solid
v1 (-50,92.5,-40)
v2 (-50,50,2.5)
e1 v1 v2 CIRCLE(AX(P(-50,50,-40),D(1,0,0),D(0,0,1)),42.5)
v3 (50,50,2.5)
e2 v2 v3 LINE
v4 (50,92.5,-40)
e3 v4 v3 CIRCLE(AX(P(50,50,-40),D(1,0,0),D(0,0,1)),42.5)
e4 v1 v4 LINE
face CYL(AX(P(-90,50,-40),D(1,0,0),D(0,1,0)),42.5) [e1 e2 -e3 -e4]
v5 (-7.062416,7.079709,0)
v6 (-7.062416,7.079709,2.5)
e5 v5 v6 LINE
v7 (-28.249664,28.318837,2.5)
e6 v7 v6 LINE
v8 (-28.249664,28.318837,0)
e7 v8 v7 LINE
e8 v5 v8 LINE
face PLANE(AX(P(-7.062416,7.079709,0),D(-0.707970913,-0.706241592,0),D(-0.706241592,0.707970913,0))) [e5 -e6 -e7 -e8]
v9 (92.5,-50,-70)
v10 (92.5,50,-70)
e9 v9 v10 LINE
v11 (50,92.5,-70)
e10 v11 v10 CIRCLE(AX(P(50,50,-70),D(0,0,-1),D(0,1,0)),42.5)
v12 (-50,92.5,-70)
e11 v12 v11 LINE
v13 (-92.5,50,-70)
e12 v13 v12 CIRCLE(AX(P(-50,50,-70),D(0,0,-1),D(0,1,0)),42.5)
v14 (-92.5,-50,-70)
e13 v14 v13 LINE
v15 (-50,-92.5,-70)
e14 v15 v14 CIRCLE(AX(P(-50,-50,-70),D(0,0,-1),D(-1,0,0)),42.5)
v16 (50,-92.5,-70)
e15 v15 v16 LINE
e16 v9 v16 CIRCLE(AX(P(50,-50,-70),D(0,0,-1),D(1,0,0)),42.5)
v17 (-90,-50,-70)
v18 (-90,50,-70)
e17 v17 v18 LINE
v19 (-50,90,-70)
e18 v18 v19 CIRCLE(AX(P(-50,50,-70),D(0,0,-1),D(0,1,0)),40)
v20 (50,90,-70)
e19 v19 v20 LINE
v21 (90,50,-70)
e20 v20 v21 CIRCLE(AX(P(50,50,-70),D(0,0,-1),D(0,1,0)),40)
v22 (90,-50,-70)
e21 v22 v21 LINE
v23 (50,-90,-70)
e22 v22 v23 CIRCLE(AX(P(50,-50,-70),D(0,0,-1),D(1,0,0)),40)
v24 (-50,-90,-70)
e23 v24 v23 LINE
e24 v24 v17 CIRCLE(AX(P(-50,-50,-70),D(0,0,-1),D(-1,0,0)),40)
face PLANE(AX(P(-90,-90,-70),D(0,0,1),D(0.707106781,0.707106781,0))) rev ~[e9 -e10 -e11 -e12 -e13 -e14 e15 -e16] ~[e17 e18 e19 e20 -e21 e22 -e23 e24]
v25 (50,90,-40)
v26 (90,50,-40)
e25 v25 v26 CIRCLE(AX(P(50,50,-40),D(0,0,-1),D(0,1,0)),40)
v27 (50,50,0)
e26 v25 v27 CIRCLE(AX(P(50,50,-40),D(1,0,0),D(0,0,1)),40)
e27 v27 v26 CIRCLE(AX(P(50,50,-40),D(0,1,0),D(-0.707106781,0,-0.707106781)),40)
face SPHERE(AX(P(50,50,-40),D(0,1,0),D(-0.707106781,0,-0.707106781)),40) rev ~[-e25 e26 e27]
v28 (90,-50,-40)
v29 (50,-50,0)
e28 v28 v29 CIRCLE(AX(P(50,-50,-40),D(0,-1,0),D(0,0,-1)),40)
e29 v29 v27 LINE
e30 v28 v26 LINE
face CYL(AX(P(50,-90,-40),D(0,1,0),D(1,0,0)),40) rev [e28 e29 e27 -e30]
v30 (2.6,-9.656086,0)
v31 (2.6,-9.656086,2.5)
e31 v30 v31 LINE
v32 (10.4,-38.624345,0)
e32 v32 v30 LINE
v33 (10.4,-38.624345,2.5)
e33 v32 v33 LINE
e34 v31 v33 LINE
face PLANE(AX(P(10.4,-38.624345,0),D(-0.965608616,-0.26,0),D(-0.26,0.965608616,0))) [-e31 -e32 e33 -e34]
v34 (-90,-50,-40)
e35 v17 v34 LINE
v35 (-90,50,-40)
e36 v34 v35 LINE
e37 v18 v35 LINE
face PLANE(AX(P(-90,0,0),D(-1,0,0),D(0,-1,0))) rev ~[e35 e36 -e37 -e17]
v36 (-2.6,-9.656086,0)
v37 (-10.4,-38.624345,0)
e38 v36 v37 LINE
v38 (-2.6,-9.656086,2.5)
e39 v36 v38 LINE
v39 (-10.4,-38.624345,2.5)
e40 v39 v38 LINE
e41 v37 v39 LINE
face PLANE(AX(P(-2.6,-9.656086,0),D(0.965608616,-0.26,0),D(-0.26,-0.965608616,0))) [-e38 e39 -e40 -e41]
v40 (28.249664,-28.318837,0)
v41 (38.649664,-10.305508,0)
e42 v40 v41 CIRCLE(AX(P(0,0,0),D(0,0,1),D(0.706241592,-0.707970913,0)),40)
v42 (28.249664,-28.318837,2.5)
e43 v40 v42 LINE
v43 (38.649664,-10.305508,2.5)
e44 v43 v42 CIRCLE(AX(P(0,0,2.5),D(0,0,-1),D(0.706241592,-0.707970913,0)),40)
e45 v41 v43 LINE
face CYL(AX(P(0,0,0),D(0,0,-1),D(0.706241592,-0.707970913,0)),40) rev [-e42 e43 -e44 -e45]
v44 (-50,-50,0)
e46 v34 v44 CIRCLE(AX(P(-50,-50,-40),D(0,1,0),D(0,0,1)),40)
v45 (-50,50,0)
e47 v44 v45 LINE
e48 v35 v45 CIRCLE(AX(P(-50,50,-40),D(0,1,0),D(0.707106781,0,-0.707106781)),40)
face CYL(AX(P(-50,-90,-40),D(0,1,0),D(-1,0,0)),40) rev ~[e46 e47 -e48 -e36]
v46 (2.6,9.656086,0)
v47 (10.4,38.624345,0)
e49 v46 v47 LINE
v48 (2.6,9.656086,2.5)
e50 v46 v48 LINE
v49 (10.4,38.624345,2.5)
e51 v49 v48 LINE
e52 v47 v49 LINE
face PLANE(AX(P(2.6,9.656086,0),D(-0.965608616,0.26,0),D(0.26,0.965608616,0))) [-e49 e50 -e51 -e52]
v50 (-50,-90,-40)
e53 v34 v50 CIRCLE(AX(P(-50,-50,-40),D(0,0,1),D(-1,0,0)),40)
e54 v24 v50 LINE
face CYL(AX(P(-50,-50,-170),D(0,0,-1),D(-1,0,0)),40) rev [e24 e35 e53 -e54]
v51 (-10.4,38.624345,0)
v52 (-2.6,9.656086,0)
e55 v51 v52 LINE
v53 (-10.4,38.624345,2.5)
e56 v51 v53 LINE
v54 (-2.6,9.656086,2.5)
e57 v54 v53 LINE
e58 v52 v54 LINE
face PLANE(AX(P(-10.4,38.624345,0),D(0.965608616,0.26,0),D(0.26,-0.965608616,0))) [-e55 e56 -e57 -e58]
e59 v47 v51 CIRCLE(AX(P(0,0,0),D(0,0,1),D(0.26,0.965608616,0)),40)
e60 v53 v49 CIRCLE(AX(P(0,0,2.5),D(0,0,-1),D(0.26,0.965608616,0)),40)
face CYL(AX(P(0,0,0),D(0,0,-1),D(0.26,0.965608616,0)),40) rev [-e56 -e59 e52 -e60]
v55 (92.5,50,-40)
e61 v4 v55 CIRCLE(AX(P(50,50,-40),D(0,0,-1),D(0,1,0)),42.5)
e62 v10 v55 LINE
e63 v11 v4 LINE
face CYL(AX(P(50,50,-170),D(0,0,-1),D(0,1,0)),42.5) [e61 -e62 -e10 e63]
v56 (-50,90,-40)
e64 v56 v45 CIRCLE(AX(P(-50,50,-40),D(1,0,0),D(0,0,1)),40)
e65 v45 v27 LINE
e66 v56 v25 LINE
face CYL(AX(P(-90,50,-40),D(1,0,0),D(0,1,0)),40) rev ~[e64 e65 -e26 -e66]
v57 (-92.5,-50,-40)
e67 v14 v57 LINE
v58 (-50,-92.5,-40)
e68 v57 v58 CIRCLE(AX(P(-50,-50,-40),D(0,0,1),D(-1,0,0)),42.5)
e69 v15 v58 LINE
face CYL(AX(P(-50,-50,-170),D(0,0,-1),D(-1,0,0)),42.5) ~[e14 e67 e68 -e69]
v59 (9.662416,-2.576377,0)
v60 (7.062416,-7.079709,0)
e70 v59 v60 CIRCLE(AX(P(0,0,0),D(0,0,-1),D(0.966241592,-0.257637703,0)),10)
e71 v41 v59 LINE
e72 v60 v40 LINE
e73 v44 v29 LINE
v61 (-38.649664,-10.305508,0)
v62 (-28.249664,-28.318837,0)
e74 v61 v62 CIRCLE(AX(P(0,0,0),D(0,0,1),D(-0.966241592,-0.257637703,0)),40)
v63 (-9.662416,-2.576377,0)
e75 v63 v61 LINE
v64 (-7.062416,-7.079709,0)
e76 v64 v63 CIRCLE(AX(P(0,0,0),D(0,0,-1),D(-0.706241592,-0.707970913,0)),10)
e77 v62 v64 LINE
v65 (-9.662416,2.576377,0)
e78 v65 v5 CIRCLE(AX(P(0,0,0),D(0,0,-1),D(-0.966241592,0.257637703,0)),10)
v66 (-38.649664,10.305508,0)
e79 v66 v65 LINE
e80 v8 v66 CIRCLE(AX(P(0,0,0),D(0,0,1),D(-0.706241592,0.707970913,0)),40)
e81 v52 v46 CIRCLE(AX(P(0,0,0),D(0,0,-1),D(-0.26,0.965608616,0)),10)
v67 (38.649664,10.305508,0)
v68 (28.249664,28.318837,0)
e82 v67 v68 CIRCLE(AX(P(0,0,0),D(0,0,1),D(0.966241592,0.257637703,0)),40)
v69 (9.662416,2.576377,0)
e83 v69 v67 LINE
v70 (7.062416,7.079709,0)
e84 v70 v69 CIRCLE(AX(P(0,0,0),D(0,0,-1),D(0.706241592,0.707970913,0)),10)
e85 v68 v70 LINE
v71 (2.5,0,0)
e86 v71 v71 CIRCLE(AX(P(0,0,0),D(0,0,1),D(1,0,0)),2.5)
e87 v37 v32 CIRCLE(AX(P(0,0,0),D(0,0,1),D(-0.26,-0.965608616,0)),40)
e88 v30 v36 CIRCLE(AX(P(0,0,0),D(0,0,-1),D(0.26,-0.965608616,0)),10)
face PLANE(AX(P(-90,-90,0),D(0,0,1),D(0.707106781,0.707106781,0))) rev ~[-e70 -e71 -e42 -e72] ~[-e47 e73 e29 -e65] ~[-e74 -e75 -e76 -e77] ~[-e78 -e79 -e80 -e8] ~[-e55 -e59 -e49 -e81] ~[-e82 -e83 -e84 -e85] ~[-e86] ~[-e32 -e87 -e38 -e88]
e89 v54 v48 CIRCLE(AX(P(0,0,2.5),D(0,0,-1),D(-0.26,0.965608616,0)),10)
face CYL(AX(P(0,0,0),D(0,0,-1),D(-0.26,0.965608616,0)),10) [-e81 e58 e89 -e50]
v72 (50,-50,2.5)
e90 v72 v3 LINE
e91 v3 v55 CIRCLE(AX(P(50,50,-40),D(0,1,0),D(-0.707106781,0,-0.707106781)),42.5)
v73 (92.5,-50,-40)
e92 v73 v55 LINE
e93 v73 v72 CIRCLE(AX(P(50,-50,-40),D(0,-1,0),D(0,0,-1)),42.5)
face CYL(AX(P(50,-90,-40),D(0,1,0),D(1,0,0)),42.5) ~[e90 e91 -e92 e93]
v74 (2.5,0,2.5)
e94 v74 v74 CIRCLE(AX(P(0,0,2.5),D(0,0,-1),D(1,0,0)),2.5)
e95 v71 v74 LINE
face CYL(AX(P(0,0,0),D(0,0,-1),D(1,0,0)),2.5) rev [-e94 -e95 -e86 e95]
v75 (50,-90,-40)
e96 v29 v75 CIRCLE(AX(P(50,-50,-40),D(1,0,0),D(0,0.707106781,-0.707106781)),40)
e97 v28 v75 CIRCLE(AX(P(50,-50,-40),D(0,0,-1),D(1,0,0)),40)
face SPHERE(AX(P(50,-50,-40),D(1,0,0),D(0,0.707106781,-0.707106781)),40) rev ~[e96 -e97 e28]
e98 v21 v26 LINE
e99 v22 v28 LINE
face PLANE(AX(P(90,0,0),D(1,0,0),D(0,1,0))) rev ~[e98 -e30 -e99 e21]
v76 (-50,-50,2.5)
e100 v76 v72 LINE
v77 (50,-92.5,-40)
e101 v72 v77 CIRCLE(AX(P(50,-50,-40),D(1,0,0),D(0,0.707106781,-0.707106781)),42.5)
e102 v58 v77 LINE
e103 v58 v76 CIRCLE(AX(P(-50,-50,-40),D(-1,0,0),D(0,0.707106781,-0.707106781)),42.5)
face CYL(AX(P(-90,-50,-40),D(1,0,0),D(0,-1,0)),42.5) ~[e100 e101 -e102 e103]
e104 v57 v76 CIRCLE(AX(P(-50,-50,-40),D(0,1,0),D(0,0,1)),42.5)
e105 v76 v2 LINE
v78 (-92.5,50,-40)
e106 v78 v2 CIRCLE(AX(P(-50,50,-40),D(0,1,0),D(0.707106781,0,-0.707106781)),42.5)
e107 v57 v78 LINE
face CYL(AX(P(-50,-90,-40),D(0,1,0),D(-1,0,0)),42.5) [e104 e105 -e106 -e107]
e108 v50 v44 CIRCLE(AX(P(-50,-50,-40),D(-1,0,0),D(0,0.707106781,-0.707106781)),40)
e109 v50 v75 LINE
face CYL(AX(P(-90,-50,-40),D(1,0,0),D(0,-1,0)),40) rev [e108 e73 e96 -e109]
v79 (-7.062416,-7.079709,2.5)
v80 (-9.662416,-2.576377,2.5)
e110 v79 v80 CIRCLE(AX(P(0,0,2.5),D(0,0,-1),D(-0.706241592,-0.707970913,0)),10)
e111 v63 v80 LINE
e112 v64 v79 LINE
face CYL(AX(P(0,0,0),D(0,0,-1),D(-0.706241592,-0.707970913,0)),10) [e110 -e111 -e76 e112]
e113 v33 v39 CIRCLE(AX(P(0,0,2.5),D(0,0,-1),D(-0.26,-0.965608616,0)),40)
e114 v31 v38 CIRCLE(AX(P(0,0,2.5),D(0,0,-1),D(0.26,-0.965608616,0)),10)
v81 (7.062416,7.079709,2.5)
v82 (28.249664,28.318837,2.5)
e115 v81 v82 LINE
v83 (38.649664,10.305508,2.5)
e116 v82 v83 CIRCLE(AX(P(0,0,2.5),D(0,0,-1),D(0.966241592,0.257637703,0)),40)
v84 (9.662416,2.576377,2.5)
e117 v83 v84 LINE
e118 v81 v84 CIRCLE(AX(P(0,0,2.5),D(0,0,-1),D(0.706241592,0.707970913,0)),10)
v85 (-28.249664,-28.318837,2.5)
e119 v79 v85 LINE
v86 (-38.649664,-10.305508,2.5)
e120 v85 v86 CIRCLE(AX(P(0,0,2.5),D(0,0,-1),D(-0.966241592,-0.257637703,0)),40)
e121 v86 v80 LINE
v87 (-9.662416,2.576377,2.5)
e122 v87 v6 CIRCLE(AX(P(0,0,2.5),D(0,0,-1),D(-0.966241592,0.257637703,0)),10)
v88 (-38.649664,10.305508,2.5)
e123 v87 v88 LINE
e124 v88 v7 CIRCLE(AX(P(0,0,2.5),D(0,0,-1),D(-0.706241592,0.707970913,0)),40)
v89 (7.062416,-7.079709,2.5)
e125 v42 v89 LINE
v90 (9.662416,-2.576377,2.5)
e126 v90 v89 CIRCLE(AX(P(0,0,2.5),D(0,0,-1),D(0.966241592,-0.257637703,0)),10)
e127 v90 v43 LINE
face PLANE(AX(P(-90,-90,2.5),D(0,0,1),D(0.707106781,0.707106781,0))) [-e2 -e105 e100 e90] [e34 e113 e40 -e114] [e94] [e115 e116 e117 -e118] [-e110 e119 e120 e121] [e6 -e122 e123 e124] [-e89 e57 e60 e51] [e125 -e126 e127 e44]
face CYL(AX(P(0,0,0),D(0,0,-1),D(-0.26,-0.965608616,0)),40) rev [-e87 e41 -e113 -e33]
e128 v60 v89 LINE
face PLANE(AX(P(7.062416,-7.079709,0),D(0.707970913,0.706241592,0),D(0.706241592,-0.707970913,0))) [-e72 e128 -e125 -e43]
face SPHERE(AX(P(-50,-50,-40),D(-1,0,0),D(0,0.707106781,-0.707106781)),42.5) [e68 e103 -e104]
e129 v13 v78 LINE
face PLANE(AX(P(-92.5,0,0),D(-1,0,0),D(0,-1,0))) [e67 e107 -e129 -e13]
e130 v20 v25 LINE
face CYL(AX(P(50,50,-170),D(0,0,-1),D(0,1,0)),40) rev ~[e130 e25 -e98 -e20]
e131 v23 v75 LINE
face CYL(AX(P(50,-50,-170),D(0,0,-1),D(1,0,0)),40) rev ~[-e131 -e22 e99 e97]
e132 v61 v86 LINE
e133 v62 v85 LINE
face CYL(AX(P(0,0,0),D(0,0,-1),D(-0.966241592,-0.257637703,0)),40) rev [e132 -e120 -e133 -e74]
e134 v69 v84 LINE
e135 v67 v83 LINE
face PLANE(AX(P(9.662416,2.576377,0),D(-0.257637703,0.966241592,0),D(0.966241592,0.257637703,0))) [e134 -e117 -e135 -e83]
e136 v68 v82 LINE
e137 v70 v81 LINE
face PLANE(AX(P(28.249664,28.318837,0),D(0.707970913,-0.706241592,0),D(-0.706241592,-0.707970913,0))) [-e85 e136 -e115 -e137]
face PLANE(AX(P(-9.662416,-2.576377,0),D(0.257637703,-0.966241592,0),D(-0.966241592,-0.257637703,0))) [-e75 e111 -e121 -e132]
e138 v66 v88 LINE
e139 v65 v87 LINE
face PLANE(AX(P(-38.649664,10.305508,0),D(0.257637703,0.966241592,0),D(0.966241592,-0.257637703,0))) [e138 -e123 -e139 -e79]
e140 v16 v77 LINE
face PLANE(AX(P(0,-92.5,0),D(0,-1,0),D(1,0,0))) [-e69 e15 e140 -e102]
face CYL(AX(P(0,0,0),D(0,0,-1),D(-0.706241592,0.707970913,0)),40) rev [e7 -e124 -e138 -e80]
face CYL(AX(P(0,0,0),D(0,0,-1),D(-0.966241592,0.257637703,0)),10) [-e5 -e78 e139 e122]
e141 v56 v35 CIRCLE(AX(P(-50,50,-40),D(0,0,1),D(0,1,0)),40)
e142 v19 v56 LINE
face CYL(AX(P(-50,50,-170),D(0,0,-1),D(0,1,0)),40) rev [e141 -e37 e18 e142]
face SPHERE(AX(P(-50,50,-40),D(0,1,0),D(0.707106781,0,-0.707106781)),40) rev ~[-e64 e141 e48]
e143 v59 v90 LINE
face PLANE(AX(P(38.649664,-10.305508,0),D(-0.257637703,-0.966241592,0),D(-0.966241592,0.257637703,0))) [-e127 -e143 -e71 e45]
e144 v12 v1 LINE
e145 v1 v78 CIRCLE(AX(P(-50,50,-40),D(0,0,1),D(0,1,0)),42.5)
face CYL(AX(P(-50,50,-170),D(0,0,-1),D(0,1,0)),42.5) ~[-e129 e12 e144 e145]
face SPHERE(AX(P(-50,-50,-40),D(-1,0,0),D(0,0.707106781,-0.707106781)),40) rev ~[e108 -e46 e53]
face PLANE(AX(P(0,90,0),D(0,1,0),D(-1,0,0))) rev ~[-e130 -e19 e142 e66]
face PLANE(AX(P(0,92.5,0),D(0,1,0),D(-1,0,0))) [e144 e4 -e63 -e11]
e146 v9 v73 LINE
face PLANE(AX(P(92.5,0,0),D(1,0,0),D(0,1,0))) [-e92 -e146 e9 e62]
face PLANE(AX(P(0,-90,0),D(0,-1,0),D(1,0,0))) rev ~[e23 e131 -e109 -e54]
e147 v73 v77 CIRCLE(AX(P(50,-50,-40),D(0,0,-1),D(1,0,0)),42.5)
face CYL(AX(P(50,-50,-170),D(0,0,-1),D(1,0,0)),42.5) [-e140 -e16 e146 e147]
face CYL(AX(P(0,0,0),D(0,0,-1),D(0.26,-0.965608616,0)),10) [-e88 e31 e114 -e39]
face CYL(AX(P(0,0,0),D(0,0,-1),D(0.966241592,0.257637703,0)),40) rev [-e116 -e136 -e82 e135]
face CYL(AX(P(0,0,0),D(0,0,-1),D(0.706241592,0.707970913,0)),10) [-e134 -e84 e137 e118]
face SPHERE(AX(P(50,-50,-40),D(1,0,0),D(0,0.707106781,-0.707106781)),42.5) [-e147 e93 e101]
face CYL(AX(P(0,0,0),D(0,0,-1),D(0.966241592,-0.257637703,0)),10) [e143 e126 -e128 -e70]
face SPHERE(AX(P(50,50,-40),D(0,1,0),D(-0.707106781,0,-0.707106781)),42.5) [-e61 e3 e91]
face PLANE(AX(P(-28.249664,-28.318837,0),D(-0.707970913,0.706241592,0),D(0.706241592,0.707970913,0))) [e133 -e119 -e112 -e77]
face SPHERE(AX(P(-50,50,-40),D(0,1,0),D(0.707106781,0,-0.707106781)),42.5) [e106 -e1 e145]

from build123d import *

# Parameters (mm, degrees)
F2_W         = 180
F2_H         = 180
F3_W         = 180
F3_H         = 180
F5_R         = 40
F6_T1_DEPTH  = 130
F6_S5_W      = 40
F6_S5_H      = 40
F6_T6_DEPTH  = 40
F6_S11_W     = 40
F6_S11_H     = 40
F6_T12_DEPTH = 40
F6_S17_W     = 40
F6_S17_H     = 40
F6_T18_DEPTH = 40
F6_S23_W     = 40
F6_S23_H     = 40
F6_T24_DEPTH = 40
F7_T         = 2.5
F0_R         = 2.5
F8_DEPTH     = 2.501


# Not quite as in the source:
# - a fillet or chamfer that OpenCascade refuses, or shapes differently, is made with other operations: its cross-section is extruded or revolved along the edge and cut away or added


with BuildPart() as f4:
    # F2 (on offset) → F4 section 0
    with BuildSketch(Plane.XY.offset(-70)):
        Rectangle(F2_W, F2_H)
    # F3 (on Top) → F4 section 1
    with BuildSketch(Plane.XY):
        Rectangle(F3_W, F3_H)
    loft()

    # F5
    f5_edges = [f4.edges().sort_by_distance(p)[0] for p in [
        (90, 0, 0),
        (0, -90, 0),
        (-90, 0, 0),
        (0, 90, 0),
    ]]
    fillet(f5_edges, radius=F5_R)

    # F6: fillet of radius 40 on 4 edges, made by hand

    # F6_s2 → F6_t1 (cut)
    with BuildSketch(Plane.XY.offset(-170)):
        with BuildLine():
            ThreePointArc((90, -50), (78.2842712475, -78.2842712475), (50, -90))
            Line((50, -90), (90, -90))
            Line((90, -90), (90, -50))
        make_face()
        with BuildLine():
            ThreePointArc((50, 90), (78.2842712475, 78.2842712475), (90, 50))
            Line((90, 50), (90, 90))
            Line((90, 90), (50, 90))
        make_face()
        with BuildLine():
            ThreePointArc((-50, 90), (-78.2842712475, 78.2842712475), (-90, 50))
            Line((-90, 50), (-90, 90))
            Line((-90, 90), (-50, 90))
        make_face()
        with BuildLine():
            ThreePointArc((-90, -50), (-78.2842712475, -78.2842712475), (-50, -90))
            Line((-50, -90), (-90, -90))
            Line((-90, -90), (-90, -50))
        make_face()
    extrude(amount=F6_T1_DEPTH, mode=Mode.SUBTRACT)


with BuildPart() as f6_tool4:
    # F6_s5 → F6_t6 (new body)
    with BuildSketch(Plane.YZ.offset(-50)):
        with Locations((-70, -20)):
            Rectangle(F6_S5_W, F6_S5_H)
    extrude(amount=-F6_T6_DEPTH)

    # F6_s7 → F6_t8 (revolve, cut)
    with BuildSketch(Plane(origin=(-50, -50, -40), x_dir=(0, 0.7071067812, -0.7071067812), z_dir=(0, 0.7071067812, 0.7071067812))):
        with BuildLine():
            ThreePointArc((0, -40), (40, 0), (0, 40))
            Line((0, 40), (0, -40))
        make_face()
    revolve(axis=Axis((-50, -50, -40), (-1, 0, 0)), mode=Mode.SUBTRACT)


with BuildPart() as f4_1:
    add(f4.part)

    # F6_t3: cut F6_tool4
    add(f6_tool4.part, mode=Mode.SUBTRACT)


with BuildPart() as f6_tool10:
    # F6_s11 → F6_t12 (new body)
    with BuildSketch(Plane.XZ.offset(-50)):
        with Locations((-70, -20)):
            Rectangle(F6_S11_W, F6_S11_H)
    extrude(amount=-F6_T12_DEPTH)

    # F6_s13 → F6_t14 (revolve, cut)
    with BuildSketch(Plane(origin=(-50, 50, -40), x_dir=(0.7071067812, 0, -0.7071067812), z_dir=(0.7071067812, 0, 0.7071067812))):
        with BuildLine():
            ThreePointArc((0, -40), (40, 0), (0, 40))
            Line((0, 40), (0, -40))
        make_face()
    revolve(axis=Axis((-50, 50, -40), (0, 1, 0)), mode=Mode.SUBTRACT)


with BuildPart() as f4_2:
    add(f4_1.part)

    # F6_t9: cut F6_tool10
    add(f6_tool10.part, mode=Mode.SUBTRACT)


with BuildPart() as f6_tool16:
    # F6_s17 → F6_t18 (new body)
    with BuildSketch(Plane.XZ.offset(-50)):
        with Locations((70, -20)):
            Rectangle(F6_S17_W, F6_S17_H)
    extrude(amount=-F6_T18_DEPTH)

    # F6_s19 → F6_t20 (revolve, cut)
    with BuildSketch(Plane(origin=(50, 50, -40), x_dir=(-0.7071067812, 0, -0.7071067812), z_dir=(0.7071067812, 0, -0.7071067812))):
        with BuildLine():
            ThreePointArc((0, -40), (40, 0), (0, 40))
            Line((0, 40), (0, -40))
        make_face()
    revolve(axis=Axis((50, 50, -40), (0, 1, 0)), mode=Mode.SUBTRACT)


with BuildPart() as f4_3:
    add(f4_2.part)

    # F6_t15: cut F6_tool16
    add(f6_tool16.part, mode=Mode.SUBTRACT)


with BuildPart() as f6_tool22:
    # F6_s23 → F6_t24 (new body)
    with BuildSketch(Plane.YZ.offset(50)):
        with Locations((-70, -20)):
            Rectangle(F6_S23_W, F6_S23_H)
    extrude(amount=F6_T24_DEPTH)

    # F6_s25 → F6_t26 (revolve, cut)
    with BuildSketch(Plane(origin=(50, -50, -40), x_dir=(0, 0.7071067812, -0.7071067812), z_dir=(0, -0.7071067812, -0.7071067812))):
        with BuildLine():
            ThreePointArc((0, -40), (40, 0), (0, 40))
            Line((0, 40), (0, -40))
        make_face()
    revolve(axis=Axis((50, -50, -40), (1, 0, 0)), mode=Mode.SUBTRACT)


with BuildPart() as f4_4:
    add(f4_3.part)

    # F6_t21: cut F6_tool22
    add(f6_tool22.part, mode=Mode.SUBTRACT)

    # F7
    f7_openings = [f4_4.faces().sort_by_distance(p)[0] for p in [
        (0, 0, -70),
    ]]
    offset(amount=F7_T, openings=f7_openings)

    # F0 (on Top) → F8 (cut, through all)
    with BuildSketch(Plane.XY):
        with BuildLine():
            Line((-10.4, 38.6243446546), (-2.6, 9.6560861637))
            ThreePointArc((-2.6, 9.6560861637), (0, 10), (2.6, 9.6560861637))
            Line((2.6, 9.6560861637), (10.4, 38.6243446546))
            ThreePointArc((10.4, 38.6243446546), (0, 40), (-10.4, 38.6243446546))
        make_face()
        with BuildLine():
            ThreePointArc((-9.6624159189, 2.576377032), (-8.6602540378, 5), (-7.0624159189, 7.0797091317))
            Line((-7.0624159189, 7.0797091317), (-28.2496636754, 28.3188365267))
            ThreePointArc((-28.2496636754, 28.3188365267), (-34.6410161514, 20), (-38.6496636754, 10.305508128))
            Line((-38.6496636754, 10.305508128), (-9.6624159189, 2.576377032))
        make_face()
        with BuildLine():
            ThreePointArc((-7.0624159189, -7.0797091317), (-8.6602540378, -5), (-9.6624159189, -2.576377032))
            Line((-9.6624159189, -2.576377032), (-38.6496636754, -10.305508128))
            ThreePointArc((-38.6496636754, -10.305508128), (-34.6410161514, -20), (-28.2496636754, -28.3188365267))
            Line((-28.2496636754, -28.3188365267), (-7.0624159189, -7.0797091317))
        make_face()
        with BuildLine():
            ThreePointArc((2.6, -9.6560861637), (0, -10), (-2.6, -9.6560861637))
            Line((-2.6, -9.6560861637), (-10.4, -38.6243446546))
            ThreePointArc((-10.4, -38.6243446546), (0, -40), (10.4, -38.6243446546))
            Line((10.4, -38.6243446546), (2.6, -9.6560861637))
        make_face()
        with BuildLine():
            ThreePointArc((9.6624159189, -2.576377032), (8.6602540378, -5), (7.0624159189, -7.0797091317))
            Line((7.0624159189, -7.0797091317), (28.2496636754, -28.3188365267))
            ThreePointArc((28.2496636754, -28.3188365267), (34.6410161514, -20), (38.6496636754, -10.305508128))
            Line((38.6496636754, -10.305508128), (9.6624159189, -2.576377032))
        make_face()
        with BuildLine():
            ThreePointArc((7.0624159189, 7.0797091317), (8.6602540378, 5), (9.6624159189, 2.576377032))
            Line((9.6624159189, 2.576377032), (38.6496636754, 10.305508128))
            ThreePointArc((38.6496636754, 10.305508128), (34.6410161514, 20), (28.2496636754, 28.3188365267))
            Line((28.2496636754, 28.3188365267), (7.0624159189, 7.0797091317))
        make_face()
        Circle(F0_R)
    extrude(amount=F8_DEPTH, mode=Mode.SUBTRACT)


solid = f4_4.part
